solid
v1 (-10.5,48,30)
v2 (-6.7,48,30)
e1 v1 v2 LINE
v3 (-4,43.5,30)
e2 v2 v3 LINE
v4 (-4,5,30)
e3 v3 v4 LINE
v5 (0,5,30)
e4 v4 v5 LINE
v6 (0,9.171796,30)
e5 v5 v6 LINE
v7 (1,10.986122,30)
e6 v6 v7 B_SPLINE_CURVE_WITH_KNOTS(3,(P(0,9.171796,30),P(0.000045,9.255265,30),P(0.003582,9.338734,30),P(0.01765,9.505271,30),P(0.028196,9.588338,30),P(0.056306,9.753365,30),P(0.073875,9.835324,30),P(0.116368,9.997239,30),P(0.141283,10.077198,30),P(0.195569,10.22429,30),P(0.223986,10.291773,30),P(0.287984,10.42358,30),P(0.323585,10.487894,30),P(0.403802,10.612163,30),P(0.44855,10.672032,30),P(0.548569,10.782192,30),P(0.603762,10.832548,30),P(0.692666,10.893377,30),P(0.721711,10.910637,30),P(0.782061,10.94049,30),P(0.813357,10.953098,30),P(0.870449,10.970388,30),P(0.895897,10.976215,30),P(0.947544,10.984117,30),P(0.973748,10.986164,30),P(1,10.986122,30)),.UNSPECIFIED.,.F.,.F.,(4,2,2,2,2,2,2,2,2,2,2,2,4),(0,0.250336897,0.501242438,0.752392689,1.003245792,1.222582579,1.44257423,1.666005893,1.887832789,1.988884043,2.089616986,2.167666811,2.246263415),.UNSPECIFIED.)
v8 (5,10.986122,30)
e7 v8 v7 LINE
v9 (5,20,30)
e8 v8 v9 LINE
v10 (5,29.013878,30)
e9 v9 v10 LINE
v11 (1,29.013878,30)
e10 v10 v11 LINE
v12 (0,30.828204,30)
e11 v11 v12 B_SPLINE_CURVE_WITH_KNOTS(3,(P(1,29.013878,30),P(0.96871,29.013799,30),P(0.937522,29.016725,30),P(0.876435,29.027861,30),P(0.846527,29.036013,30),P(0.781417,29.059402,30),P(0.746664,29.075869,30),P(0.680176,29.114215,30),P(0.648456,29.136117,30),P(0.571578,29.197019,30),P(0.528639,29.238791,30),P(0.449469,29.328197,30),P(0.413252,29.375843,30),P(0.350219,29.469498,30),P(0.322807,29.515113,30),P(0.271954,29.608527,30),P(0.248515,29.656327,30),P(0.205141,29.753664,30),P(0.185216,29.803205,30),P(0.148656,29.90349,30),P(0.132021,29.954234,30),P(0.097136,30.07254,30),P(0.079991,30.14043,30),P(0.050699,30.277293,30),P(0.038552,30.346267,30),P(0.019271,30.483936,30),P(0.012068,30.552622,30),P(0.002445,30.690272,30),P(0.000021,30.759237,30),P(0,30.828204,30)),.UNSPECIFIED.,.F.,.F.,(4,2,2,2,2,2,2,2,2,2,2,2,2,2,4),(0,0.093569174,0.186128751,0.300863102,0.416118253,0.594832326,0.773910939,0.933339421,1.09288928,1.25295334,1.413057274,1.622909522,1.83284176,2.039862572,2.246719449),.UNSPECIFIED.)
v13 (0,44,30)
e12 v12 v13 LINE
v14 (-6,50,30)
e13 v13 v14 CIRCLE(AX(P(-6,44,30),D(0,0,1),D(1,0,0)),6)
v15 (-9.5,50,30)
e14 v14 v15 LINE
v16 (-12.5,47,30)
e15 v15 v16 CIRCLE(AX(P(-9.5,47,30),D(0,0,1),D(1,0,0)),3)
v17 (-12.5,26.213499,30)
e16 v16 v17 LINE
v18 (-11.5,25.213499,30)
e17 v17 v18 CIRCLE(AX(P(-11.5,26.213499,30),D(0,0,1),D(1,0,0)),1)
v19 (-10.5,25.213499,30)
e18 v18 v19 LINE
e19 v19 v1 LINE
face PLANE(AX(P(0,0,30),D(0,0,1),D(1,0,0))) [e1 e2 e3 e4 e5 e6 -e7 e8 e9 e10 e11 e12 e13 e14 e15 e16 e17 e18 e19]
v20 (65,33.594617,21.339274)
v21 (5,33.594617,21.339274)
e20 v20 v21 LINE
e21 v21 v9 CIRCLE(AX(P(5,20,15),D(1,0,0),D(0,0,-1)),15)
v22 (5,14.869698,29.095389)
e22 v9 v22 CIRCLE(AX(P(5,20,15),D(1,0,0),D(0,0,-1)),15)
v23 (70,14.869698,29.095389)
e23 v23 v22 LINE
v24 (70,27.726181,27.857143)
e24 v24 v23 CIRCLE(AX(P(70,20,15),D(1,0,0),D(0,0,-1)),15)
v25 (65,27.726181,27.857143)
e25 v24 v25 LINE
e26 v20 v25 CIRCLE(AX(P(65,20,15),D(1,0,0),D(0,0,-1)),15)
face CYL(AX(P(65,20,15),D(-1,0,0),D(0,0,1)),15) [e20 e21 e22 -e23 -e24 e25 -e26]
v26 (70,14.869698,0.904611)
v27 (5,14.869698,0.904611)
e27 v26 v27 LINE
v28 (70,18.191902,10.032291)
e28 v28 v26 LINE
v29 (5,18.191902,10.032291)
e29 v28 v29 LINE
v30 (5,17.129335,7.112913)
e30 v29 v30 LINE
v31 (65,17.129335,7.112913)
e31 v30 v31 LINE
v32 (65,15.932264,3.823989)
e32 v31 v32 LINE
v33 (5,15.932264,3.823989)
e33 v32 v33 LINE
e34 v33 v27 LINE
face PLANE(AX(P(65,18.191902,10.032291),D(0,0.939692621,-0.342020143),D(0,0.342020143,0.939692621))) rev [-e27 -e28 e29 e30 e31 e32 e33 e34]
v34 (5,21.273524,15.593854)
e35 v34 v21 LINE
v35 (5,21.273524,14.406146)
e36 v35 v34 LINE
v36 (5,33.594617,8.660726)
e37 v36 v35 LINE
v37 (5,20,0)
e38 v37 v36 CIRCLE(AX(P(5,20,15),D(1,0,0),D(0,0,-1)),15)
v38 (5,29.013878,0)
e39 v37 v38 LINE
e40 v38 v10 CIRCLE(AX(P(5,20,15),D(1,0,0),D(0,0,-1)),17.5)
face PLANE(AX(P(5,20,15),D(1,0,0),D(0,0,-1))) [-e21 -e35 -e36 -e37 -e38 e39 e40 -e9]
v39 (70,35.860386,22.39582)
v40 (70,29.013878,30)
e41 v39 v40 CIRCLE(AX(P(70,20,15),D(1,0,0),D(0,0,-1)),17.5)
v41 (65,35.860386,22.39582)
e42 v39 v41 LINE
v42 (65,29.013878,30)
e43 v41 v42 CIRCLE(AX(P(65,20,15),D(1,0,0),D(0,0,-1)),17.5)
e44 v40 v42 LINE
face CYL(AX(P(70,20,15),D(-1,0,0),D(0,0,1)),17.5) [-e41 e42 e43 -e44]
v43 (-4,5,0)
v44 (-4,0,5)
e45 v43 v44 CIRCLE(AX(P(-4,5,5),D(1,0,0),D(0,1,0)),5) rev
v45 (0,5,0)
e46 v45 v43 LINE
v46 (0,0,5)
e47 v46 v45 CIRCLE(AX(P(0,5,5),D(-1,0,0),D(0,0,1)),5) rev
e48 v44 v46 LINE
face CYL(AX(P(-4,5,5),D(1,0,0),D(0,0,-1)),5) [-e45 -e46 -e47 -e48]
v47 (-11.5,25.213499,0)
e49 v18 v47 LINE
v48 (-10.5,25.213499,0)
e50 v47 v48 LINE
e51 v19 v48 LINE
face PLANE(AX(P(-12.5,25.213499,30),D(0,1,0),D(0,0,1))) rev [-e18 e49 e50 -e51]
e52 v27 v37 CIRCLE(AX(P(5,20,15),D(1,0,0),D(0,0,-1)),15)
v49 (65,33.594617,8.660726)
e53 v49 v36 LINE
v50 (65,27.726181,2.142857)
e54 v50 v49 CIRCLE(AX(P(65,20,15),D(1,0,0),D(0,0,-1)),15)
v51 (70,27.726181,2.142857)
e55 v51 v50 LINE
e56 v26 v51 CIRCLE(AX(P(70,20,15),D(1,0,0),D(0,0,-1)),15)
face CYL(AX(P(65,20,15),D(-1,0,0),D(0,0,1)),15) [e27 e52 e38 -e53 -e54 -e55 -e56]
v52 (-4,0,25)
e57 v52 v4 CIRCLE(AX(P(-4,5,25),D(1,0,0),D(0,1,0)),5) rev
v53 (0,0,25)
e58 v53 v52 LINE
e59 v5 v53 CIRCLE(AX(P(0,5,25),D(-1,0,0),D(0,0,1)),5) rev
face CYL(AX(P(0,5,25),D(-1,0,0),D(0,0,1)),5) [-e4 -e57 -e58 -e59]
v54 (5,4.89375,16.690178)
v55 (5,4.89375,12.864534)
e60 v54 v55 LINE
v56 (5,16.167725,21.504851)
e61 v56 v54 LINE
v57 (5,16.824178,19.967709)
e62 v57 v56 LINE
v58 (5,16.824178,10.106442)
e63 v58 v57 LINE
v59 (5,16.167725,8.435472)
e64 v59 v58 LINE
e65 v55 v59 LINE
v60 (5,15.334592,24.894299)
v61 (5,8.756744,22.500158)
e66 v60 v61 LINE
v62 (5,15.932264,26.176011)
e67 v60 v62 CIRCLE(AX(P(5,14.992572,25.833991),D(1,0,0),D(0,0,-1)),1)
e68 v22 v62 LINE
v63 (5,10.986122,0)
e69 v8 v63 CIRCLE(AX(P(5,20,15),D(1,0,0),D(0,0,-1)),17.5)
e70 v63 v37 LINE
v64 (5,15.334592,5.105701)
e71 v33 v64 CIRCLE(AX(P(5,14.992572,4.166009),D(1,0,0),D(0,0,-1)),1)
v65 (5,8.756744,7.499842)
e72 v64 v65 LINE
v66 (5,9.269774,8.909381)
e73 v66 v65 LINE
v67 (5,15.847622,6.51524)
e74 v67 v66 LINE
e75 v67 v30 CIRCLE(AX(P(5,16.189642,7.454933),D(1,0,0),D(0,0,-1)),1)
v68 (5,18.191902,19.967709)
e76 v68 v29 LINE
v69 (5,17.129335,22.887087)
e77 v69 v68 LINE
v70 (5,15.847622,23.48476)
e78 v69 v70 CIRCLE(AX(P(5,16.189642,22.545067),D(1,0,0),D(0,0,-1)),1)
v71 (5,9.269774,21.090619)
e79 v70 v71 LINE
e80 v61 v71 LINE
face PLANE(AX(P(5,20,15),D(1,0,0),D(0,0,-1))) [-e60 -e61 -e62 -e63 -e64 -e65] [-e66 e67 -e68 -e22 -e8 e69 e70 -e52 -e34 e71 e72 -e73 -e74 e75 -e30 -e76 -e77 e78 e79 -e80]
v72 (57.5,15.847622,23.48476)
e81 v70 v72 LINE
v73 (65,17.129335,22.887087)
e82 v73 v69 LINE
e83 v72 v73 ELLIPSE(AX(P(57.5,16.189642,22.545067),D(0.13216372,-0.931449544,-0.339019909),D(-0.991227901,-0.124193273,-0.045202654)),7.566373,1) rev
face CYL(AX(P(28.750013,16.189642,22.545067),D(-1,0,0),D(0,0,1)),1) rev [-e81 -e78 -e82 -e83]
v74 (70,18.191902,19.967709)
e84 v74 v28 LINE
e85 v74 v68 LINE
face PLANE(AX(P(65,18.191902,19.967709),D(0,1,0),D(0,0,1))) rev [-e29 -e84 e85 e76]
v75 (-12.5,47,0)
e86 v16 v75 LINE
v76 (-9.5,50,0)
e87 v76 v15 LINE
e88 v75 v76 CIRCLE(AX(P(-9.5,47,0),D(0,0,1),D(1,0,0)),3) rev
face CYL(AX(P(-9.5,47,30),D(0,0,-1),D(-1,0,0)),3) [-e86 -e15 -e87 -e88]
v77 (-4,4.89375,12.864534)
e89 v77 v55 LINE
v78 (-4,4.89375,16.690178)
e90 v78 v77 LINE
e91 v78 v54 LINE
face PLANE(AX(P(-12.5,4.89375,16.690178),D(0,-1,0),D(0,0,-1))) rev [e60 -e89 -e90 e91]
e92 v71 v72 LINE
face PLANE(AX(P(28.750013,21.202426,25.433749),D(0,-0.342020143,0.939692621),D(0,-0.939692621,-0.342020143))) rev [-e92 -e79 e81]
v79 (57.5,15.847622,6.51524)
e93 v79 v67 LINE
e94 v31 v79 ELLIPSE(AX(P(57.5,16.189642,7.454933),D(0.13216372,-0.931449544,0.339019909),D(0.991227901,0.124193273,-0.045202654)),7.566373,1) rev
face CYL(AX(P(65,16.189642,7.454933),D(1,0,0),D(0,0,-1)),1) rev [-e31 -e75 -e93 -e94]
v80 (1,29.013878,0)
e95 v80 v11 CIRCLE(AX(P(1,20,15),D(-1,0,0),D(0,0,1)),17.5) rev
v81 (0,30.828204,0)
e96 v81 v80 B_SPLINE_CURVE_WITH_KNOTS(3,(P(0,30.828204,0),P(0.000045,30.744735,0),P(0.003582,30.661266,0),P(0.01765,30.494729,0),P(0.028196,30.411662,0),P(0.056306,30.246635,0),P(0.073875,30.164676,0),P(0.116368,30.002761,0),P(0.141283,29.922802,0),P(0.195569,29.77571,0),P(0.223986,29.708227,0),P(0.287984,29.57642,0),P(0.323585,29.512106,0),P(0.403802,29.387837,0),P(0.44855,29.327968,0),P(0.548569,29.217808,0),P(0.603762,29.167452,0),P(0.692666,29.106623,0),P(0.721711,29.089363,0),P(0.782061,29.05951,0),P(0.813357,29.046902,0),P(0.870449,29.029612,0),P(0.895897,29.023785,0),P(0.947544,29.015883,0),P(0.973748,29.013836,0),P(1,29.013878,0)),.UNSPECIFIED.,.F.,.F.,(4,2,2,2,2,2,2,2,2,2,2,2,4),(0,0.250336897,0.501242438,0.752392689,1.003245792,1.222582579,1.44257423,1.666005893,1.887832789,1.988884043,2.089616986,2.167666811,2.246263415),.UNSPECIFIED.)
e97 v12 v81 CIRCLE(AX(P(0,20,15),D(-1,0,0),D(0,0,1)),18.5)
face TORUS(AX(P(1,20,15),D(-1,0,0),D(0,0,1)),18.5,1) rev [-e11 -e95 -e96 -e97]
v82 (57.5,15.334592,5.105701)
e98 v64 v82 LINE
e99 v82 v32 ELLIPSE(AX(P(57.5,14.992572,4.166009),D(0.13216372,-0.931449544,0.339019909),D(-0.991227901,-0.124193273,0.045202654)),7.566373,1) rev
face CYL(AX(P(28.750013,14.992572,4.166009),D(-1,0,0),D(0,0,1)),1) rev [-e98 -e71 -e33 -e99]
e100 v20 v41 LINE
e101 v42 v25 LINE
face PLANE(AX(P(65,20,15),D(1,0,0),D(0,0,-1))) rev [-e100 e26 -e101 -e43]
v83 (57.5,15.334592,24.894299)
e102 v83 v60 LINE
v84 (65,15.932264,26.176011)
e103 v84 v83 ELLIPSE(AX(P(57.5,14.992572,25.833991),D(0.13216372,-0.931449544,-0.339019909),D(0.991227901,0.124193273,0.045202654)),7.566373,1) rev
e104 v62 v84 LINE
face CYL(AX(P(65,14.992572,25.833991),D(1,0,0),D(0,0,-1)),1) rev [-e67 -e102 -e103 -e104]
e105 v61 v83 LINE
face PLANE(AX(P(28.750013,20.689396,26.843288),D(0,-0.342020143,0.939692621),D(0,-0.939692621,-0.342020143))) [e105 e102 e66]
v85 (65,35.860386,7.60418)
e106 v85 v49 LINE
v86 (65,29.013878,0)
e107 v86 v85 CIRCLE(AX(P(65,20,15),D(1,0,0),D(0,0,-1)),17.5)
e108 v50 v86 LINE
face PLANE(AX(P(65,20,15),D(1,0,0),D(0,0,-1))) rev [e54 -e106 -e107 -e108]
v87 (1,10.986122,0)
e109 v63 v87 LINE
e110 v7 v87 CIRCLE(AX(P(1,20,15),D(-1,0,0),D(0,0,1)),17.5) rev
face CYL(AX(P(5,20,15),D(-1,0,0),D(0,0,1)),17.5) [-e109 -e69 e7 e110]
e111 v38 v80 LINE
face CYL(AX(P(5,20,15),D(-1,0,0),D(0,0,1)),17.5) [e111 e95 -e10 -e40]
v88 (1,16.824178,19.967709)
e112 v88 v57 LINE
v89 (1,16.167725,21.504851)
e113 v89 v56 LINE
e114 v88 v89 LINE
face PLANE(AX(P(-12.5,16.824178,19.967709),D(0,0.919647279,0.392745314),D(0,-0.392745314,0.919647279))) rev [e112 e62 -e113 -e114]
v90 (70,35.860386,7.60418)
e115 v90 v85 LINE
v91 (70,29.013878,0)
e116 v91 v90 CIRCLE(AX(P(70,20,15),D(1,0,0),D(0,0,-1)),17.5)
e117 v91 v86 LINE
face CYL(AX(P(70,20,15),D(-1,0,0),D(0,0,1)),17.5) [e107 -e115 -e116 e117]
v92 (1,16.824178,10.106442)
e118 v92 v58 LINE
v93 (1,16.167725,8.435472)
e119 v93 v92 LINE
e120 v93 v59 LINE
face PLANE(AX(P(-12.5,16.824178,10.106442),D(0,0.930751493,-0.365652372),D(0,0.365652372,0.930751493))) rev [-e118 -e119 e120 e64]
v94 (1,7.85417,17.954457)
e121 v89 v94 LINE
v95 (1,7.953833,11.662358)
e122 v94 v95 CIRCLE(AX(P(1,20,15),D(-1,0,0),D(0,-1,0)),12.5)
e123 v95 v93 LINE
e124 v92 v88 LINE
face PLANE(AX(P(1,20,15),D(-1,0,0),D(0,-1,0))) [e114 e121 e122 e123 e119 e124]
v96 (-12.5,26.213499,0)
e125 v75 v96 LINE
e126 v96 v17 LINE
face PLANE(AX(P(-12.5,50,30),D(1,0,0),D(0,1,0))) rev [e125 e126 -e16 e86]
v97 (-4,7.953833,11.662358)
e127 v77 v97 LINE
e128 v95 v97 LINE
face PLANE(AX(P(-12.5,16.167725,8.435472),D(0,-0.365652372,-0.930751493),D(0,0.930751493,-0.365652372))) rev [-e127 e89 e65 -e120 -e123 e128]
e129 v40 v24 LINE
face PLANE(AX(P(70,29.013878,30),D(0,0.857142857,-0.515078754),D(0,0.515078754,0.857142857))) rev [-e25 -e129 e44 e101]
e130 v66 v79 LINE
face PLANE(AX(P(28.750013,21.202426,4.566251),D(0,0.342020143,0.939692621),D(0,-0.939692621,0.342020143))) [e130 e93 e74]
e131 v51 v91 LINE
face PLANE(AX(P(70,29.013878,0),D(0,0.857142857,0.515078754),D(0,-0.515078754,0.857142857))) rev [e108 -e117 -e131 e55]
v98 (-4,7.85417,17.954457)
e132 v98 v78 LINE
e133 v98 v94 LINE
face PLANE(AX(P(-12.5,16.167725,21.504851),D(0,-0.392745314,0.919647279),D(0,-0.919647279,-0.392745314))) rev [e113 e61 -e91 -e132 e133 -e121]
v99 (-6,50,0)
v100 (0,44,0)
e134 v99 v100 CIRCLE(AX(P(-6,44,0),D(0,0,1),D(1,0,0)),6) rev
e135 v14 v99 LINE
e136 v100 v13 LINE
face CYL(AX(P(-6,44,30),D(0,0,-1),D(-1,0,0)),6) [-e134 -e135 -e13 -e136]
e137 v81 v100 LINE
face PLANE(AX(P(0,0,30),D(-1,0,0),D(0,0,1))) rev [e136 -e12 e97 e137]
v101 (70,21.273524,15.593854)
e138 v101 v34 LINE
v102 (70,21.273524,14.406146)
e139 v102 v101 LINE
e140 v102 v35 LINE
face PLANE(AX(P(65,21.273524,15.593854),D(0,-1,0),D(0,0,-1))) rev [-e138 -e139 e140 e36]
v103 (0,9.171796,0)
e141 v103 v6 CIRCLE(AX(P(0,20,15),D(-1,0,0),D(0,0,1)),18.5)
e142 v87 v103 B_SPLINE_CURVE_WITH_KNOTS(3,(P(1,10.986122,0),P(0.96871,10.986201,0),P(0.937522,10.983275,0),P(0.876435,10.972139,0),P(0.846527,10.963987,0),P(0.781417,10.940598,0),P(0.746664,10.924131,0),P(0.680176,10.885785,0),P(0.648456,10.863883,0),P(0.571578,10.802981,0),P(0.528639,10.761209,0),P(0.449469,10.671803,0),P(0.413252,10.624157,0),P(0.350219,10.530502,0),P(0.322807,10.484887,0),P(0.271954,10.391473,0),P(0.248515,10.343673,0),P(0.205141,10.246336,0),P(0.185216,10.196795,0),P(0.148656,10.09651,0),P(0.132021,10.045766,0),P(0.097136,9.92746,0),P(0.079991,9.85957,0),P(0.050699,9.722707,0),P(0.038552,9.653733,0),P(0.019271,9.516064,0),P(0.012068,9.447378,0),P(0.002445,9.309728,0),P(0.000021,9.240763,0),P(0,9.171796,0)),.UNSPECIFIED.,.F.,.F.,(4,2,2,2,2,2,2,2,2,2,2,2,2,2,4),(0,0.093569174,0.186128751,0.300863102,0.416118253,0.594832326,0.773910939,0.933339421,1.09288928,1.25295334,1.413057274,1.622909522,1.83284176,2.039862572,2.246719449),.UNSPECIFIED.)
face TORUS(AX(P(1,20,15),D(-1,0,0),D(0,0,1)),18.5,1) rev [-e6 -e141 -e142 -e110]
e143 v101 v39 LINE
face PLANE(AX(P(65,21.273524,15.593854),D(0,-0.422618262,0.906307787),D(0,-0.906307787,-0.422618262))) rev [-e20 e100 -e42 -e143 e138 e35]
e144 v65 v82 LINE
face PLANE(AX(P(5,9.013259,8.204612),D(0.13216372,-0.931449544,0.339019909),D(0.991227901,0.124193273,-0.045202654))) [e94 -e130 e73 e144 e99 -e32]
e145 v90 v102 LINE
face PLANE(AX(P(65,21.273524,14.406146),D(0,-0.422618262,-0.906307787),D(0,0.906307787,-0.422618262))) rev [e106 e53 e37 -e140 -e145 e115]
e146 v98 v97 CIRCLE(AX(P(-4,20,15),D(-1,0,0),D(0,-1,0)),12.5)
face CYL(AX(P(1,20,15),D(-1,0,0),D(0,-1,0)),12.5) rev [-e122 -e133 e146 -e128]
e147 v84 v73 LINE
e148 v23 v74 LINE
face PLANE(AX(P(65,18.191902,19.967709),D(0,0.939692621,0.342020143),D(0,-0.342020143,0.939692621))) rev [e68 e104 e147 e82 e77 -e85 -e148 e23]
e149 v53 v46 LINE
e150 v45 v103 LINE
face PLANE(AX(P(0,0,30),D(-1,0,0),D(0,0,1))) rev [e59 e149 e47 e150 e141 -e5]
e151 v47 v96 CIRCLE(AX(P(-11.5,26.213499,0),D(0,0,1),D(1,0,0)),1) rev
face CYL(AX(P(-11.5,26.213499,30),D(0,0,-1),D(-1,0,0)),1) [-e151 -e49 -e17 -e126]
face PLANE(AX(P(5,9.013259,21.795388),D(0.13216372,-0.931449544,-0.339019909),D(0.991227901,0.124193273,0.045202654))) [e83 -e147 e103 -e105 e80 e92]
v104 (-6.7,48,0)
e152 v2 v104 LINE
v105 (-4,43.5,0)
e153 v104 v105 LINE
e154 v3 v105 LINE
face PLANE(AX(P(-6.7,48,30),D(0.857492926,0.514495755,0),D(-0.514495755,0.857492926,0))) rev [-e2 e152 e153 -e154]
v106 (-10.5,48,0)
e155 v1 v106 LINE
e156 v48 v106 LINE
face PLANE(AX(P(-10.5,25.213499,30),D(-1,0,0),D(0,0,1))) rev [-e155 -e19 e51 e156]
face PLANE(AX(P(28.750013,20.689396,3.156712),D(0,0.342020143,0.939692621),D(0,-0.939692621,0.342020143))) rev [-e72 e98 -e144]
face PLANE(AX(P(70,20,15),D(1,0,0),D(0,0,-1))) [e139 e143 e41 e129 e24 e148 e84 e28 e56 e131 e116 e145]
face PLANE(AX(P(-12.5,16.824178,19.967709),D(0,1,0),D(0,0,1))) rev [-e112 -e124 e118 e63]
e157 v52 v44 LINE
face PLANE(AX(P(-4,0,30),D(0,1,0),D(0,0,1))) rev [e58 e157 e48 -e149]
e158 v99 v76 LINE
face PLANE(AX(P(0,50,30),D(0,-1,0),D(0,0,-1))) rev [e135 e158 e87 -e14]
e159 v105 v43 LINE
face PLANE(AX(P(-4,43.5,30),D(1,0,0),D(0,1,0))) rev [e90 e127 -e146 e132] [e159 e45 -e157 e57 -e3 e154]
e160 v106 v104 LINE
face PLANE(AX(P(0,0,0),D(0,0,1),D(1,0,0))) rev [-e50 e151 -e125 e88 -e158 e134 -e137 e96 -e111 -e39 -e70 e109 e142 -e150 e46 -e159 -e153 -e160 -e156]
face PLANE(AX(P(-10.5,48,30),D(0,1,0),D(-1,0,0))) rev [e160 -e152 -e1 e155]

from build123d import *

# Parameters (mm, degrees)
BOSS_EXTRUDE1_DEPTH = 30
BOSS_EXTRUDE3_DEPTH = 5
BOSS_EXTRUDE4_DEPTH = 60
BOSS_EXTRUDE5_DEPTH = 5
RIB2_REACH          = 93.092
SKETCH12_WALL_W     = 244.715003534
SKETCH12_WALL_H     = 1.5
RIB4_REACH          = 88.249
SKETCH15_WALL_W     = 235.02855303
SKETCH15_WALL_H     = 1.5
FILLET2_R           = 6
FILLET3_R           = 3
FILLET4_R           = 5
FILLET6_R           = 1
CUT_EXTRUDE4_DEPTH  = 88.321245983
SKETCH17_R          = 12.5
CUT_EXTRUDE5_DEPTH  = 5
FILLET7_R           = 1
FILLET8_R           = 1


with BuildPart() as part:
    # Sketch1 → Boss-Extrude1 (new body)
    with BuildSketch(Plane.XY):
        Polygon((0, 0), (0, 50), (-12.5, 50), (-12.5, 25.213498553), (-10.5, 25.213498553), (-10.5, 48), (-6.7, 48), (-4, 43.5), (-4, 0), align=None)
    extrude(amount=BOSS_EXTRUDE1_DEPTH)

    # Sketch2 → Boss-Extrude3 (add)
    with BuildSketch(Plane(origin=(0, 0, 0), x_dir=(0, 0, -1), z_dir=(1, 0, 0))):
        with BuildLine():
            Line((-30, 20), (-30, 29.013878189))
            ThreePointArc((-30, 29.013878189), (-15, 37.5), (0, 29.013878189))
            Line((0, 29.013878189), (0, 20))
            Line((0, 20), (0, 10.986121811))
            ThreePointArc((0, 10.986121811), (-15, 2.5), (-30, 10.986121811))
            Line((-30, 10.986121811), (-30, 20))
        make_face()
    extrude(amount=BOSS_EXTRUDE3_DEPTH)

    # Sketch8 → Boss-Extrude4 (add)
    with BuildSketch(Plane(origin=(5, 0, 0), x_dir=(0, 0, -1), z_dir=(1, 0, 0))):
        with BuildLine():
            Line((-15.593853911, 21.273523821), (-14.406146089, 21.273523821))
            Line((-14.406146089, 21.273523821), (-8.660726074, 33.594616806))
            ThreePointArc((-8.660726074, 33.594616806), (-1.141807012, 25.740251485), (-0.904610688, 14.86969785))
            Line((-0.904610688, 14.86969785), (-10.032290508, 18.191901612))
            Line((-10.032290508, 18.191901612), (-19.967709492, 18.191901612))
            Line((-19.967709492, 18.191901612), (-29.095389312, 14.86969785))
            ThreePointArc((-29.095389312, 14.86969785), (-28.858192988, 25.740251485), (-21.339273926, 33.594616806))
            Line((-21.339273926, 33.594616806), (-15.593853911, 21.273523821))
        make_face()
    extrude(amount=BOSS_EXTRUDE4_DEPTH)

    # Sketch9 → Boss-Extrude5 (add)
    with BuildSketch(Plane(origin=(65, 0, 0), x_dir=(0, 0, -1), z_dir=(1, 0, 0))):
        with BuildLine():
            Line((-21.339273926, 33.594616806), (-22.39581958, 35.860386273))
            ThreePointArc((-22.39581958, 35.860386273), (-26.709477013, 33.005312303), (-30, 29.013878189))
            Line((-30, 29.013878189), (-27.857142857, 27.726181305))
            ThreePointArc((-27.857142857, 27.726181305), (-29.930908857, 21.438040583), (-29.095389312, 14.86969785))
            Line((-29.095389312, 14.86969785), (-19.967709492, 18.191901612))
            Line((-19.967709492, 18.191901612), (-10.032290508, 18.191901612))
            Line((-10.032290508, 18.191901612), (-0.904610688, 14.86969785))
            ThreePointArc((-0.904610688, 14.86969785), (-0.069091143, 21.438040583), (-2.142857143, 27.726181305))
            Line((-2.142857143, 27.726181305), (0, 29.013878189))
            ThreePointArc((0, 29.013878189), (-3.290522987, 33.005312303), (-7.60418042, 35.860386273))
            Line((-7.60418042, 35.860386273), (-8.660726074, 33.594616806))
            Line((-8.660726074, 33.594616806), (-14.406146089, 21.273523821))
            Line((-14.406146089, 21.273523821), (-15.593853911, 21.273523821))
            Line((-15.593853911, 21.273523821), (-21.339273926, 33.594616806))
        make_face()
    extrude(amount=BOSS_EXTRUDE5_DEPTH)

    # Sketch12 wall → Rib2 (add, up to next)
    with BuildSketch(Plane(origin=(35, 12.772029248, 23.163468829), x_dir=(0.991227900683, 0.1241932725, 0.045202654495), z_dir=(-0.132163720089, 0.931449543789, 0.33901990866)), mode=Mode.PRIVATE) as rib2_sk1:
        Rectangle(SKETCH12_WALL_W, SKETCH12_WALL_H)
    rib2_tool1 = extrude(rib2_sk1.sketch, amount=RIB2_REACH, mode=Mode.PRIVATE) - part.part
    add(rib2_tool1.solids().sort_by_distance((35, 12.772029248, 23.163468829))[0])

    # Sketch15 wall → Rib4 (add, up to next)
    with BuildSketch(Plane(origin=(35, 12.772029248, 6.836531171), x_dir=(0.991227900683, 0.1241932725, -0.045202654495), z_dir=(-0.132163720089, 0.931449543789, -0.33901990866)), mode=Mode.PRIVATE) as rib4_sk1:
        Rectangle(SKETCH15_WALL_W, SKETCH15_WALL_H)
    rib4_tool1 = extrude(rib4_sk1.sketch, amount=RIB4_REACH, mode=Mode.PRIVATE) - part.part
    add(rib4_tool1.solids().sort_by_distance((35, 12.772029248, 6.836531171))[0])

    # Fillet2
    fillet2_edges = [part.edges().sort_by_distance(p)[0] for p in [
        (0, 50, 15),
    ]]
    fillet(fillet2_edges, radius=FILLET2_R)

    # Fillet3
    fillet3_edges = [part.edges().sort_by_distance(p)[0] for p in [
        (-12.5, 50, 15),
    ]]
    fillet(fillet3_edges, radius=FILLET3_R)

    # Fillet4
    fillet4_edges = [part.edges().sort_by_distance(p)[0] for p in [
        (-2, 0, 0),
        (-2, 0, 30),
    ]]
    fillet(fillet4_edges, radius=FILLET4_R)

    # Fillet6
    # the kernel refuses this fillet: 1 mm, written as the material it adds along each edge
    with BuildSketch(Plane(origin=(67.5, 16.274284624, 25.236318868), x_dir=(-8.283054797608712e-12, -0.34202014332566627, 0.9396926207859093), z_dir=(-1.0, 2.8329715890524774e-12, -7.783525470878232e-12))) as fillet6_piece_1_section:
        with BuildLine():
            CenterArc((FILLET6_R, -FILLET6_R), FILLET6_R, 90, 90)
            Line((0, -FILLET6_R), (0, 0))
            Line((0, 0), (FILLET6_R, 0))
        make_face()
    fillet6_piece_1 = extrude(amount=65, mode=Mode.PRIVATE)
    fillet6_piece_1 = split(fillet6_piece_1, bisect_by=Plane(origin=(34.683018445, 12.397159057, 24.069843938), z_dir=(-0.13216372008897792, 0.9314495437888441, 0.33901990865994336)), keep=Keep.TOP, mode=Mode.PRIVATE)
    add(fillet6_piece_1)
    with BuildSketch(Plane(origin=(2.5, 16.787314839, 23.826779936), x_dir=(8.283054797608713e-12, 0.3420201433256657, -0.9396926207859096), z_dir=(1.0, -2.8329715890524774e-12, 7.783525470878232e-12))) as fillet6_piece_2_section:
        with BuildLine():
            CenterArc((FILLET6_R, -FILLET6_R), FILLET6_R, 90, 90)
            Line((0, -FILLET6_R), (0, 0))
            Line((0, 0), (FILLET6_R, 0))
        make_face()
    fillet6_piece_2 = extrude(amount=65, mode=Mode.PRIVATE)
    fillet6_piece_2 = split(fillet6_piece_2, bisect_by=Plane(origin=(4.790210247, 9.320920511, 20.868309995), z_dir=(-0.13216372008897792, 0.9314495437888441, 0.33901990865994336)), keep=Keep.TOP, mode=Mode.PRIVATE)
    add(fillet6_piece_2)
    with BuildSketch(Plane(origin=(67.5, 16.787314839, 6.173220063), x_dir=(8.283047858714808e-12, 0.3420201433256657, 0.9396926207859096), z_dir=(-1.0, 2.8329692158109876e-12, 7.783518950450833e-12))) as fillet6_piece_3_section:
        with BuildLine():
            CenterArc((FILLET6_R, -FILLET6_R), FILLET6_R, 90, 90)
            Line((0, -FILLET6_R), (0, 0))
            Line((0, 0), (FILLET6_R, 0))
        make_face()
    fillet6_piece_3 = extrude(amount=65, mode=Mode.PRIVATE)
    fillet6_piece_3 = split(fillet6_piece_3, bisect_by=Plane(origin=(34.683018444, 13.067468711, 7.7718167), z_dir=(-0.13216372008897792, 0.9314495437888441, -0.33901990865994336)), keep=Keep.TOP, mode=Mode.PRIVATE)
    add(fillet6_piece_3)
    with BuildSketch(Plane(origin=(2.5, 16.274284624, 4.763681132), x_dir=(-8.283047858714808e-12, -0.342020143325666, -0.9396926207859094), z_dir=(1.0, -2.8329692158109876e-12, -7.783518950450833e-12))) as fillet6_piece_4_section:
        with BuildLine():
            CenterArc((FILLET6_R, -FILLET6_R), FILLET6_R, 90, 90)
            Line((0, -FILLET6_R), (0, 0))
            Line((0, 0), (FILLET6_R, 0))
        make_face()
    fillet6_piece_4 = extrude(amount=65, mode=Mode.PRIVATE)
    fillet6_piece_4 = split(fillet6_piece_4, bisect_by=Plane(origin=(4.790210247, 8.653026917, 7.296667437), z_dir=(-0.13216372008897792, 0.9314495437888441, -0.33901990865994336)), keep=Keep.TOP, mode=Mode.PRIVATE)
    add(fillet6_piece_4)

    # Sketch16 → Cut-Extrude4 (cut, through all)
    with BuildSketch(Plane(origin=(5, 0, 0), x_dir=(0, 0, -1), z_dir=(1, 0, 0))):
        Polygon((-19.967709492, 16.824178281), (-10.106442475, 16.824178281), (-8.435471613, 16.167725442), (-12.864533528, 4.893749658), (-16.690177608, 4.893749658), (-21.504850857, 16.167725442), align=None)
    extrude(amount=-CUT_EXTRUDE4_DEPTH, mode=Mode.SUBTRACT)

    # Sketch17 → Cut-Extrude5 (cut)
    with BuildSketch(Plane.ZY.offset(4)):
        with Locations((15, 20)):
            Circle(SKETCH17_R)
    extrude(amount=-CUT_EXTRUDE5_DEPTH, mode=Mode.SUBTRACT)

    # Fillet7
    fillet7_edges = [part.edges().sort_by_distance(p)[0] for p in [
        (-12.5, 25.213498553, 15),
    ]]
    fillet(fillet7_edges, radius=FILLET7_R)

    # Fillet8
    fillet8_edges = [part.edges().sort_by_distance(p)[0] for p in [
        (0, 37.5, 15),
        (0, 2.5, 15),
    ]]
    fillet(fillet8_edges, radius=FILLET8_R)


solid = part.part
